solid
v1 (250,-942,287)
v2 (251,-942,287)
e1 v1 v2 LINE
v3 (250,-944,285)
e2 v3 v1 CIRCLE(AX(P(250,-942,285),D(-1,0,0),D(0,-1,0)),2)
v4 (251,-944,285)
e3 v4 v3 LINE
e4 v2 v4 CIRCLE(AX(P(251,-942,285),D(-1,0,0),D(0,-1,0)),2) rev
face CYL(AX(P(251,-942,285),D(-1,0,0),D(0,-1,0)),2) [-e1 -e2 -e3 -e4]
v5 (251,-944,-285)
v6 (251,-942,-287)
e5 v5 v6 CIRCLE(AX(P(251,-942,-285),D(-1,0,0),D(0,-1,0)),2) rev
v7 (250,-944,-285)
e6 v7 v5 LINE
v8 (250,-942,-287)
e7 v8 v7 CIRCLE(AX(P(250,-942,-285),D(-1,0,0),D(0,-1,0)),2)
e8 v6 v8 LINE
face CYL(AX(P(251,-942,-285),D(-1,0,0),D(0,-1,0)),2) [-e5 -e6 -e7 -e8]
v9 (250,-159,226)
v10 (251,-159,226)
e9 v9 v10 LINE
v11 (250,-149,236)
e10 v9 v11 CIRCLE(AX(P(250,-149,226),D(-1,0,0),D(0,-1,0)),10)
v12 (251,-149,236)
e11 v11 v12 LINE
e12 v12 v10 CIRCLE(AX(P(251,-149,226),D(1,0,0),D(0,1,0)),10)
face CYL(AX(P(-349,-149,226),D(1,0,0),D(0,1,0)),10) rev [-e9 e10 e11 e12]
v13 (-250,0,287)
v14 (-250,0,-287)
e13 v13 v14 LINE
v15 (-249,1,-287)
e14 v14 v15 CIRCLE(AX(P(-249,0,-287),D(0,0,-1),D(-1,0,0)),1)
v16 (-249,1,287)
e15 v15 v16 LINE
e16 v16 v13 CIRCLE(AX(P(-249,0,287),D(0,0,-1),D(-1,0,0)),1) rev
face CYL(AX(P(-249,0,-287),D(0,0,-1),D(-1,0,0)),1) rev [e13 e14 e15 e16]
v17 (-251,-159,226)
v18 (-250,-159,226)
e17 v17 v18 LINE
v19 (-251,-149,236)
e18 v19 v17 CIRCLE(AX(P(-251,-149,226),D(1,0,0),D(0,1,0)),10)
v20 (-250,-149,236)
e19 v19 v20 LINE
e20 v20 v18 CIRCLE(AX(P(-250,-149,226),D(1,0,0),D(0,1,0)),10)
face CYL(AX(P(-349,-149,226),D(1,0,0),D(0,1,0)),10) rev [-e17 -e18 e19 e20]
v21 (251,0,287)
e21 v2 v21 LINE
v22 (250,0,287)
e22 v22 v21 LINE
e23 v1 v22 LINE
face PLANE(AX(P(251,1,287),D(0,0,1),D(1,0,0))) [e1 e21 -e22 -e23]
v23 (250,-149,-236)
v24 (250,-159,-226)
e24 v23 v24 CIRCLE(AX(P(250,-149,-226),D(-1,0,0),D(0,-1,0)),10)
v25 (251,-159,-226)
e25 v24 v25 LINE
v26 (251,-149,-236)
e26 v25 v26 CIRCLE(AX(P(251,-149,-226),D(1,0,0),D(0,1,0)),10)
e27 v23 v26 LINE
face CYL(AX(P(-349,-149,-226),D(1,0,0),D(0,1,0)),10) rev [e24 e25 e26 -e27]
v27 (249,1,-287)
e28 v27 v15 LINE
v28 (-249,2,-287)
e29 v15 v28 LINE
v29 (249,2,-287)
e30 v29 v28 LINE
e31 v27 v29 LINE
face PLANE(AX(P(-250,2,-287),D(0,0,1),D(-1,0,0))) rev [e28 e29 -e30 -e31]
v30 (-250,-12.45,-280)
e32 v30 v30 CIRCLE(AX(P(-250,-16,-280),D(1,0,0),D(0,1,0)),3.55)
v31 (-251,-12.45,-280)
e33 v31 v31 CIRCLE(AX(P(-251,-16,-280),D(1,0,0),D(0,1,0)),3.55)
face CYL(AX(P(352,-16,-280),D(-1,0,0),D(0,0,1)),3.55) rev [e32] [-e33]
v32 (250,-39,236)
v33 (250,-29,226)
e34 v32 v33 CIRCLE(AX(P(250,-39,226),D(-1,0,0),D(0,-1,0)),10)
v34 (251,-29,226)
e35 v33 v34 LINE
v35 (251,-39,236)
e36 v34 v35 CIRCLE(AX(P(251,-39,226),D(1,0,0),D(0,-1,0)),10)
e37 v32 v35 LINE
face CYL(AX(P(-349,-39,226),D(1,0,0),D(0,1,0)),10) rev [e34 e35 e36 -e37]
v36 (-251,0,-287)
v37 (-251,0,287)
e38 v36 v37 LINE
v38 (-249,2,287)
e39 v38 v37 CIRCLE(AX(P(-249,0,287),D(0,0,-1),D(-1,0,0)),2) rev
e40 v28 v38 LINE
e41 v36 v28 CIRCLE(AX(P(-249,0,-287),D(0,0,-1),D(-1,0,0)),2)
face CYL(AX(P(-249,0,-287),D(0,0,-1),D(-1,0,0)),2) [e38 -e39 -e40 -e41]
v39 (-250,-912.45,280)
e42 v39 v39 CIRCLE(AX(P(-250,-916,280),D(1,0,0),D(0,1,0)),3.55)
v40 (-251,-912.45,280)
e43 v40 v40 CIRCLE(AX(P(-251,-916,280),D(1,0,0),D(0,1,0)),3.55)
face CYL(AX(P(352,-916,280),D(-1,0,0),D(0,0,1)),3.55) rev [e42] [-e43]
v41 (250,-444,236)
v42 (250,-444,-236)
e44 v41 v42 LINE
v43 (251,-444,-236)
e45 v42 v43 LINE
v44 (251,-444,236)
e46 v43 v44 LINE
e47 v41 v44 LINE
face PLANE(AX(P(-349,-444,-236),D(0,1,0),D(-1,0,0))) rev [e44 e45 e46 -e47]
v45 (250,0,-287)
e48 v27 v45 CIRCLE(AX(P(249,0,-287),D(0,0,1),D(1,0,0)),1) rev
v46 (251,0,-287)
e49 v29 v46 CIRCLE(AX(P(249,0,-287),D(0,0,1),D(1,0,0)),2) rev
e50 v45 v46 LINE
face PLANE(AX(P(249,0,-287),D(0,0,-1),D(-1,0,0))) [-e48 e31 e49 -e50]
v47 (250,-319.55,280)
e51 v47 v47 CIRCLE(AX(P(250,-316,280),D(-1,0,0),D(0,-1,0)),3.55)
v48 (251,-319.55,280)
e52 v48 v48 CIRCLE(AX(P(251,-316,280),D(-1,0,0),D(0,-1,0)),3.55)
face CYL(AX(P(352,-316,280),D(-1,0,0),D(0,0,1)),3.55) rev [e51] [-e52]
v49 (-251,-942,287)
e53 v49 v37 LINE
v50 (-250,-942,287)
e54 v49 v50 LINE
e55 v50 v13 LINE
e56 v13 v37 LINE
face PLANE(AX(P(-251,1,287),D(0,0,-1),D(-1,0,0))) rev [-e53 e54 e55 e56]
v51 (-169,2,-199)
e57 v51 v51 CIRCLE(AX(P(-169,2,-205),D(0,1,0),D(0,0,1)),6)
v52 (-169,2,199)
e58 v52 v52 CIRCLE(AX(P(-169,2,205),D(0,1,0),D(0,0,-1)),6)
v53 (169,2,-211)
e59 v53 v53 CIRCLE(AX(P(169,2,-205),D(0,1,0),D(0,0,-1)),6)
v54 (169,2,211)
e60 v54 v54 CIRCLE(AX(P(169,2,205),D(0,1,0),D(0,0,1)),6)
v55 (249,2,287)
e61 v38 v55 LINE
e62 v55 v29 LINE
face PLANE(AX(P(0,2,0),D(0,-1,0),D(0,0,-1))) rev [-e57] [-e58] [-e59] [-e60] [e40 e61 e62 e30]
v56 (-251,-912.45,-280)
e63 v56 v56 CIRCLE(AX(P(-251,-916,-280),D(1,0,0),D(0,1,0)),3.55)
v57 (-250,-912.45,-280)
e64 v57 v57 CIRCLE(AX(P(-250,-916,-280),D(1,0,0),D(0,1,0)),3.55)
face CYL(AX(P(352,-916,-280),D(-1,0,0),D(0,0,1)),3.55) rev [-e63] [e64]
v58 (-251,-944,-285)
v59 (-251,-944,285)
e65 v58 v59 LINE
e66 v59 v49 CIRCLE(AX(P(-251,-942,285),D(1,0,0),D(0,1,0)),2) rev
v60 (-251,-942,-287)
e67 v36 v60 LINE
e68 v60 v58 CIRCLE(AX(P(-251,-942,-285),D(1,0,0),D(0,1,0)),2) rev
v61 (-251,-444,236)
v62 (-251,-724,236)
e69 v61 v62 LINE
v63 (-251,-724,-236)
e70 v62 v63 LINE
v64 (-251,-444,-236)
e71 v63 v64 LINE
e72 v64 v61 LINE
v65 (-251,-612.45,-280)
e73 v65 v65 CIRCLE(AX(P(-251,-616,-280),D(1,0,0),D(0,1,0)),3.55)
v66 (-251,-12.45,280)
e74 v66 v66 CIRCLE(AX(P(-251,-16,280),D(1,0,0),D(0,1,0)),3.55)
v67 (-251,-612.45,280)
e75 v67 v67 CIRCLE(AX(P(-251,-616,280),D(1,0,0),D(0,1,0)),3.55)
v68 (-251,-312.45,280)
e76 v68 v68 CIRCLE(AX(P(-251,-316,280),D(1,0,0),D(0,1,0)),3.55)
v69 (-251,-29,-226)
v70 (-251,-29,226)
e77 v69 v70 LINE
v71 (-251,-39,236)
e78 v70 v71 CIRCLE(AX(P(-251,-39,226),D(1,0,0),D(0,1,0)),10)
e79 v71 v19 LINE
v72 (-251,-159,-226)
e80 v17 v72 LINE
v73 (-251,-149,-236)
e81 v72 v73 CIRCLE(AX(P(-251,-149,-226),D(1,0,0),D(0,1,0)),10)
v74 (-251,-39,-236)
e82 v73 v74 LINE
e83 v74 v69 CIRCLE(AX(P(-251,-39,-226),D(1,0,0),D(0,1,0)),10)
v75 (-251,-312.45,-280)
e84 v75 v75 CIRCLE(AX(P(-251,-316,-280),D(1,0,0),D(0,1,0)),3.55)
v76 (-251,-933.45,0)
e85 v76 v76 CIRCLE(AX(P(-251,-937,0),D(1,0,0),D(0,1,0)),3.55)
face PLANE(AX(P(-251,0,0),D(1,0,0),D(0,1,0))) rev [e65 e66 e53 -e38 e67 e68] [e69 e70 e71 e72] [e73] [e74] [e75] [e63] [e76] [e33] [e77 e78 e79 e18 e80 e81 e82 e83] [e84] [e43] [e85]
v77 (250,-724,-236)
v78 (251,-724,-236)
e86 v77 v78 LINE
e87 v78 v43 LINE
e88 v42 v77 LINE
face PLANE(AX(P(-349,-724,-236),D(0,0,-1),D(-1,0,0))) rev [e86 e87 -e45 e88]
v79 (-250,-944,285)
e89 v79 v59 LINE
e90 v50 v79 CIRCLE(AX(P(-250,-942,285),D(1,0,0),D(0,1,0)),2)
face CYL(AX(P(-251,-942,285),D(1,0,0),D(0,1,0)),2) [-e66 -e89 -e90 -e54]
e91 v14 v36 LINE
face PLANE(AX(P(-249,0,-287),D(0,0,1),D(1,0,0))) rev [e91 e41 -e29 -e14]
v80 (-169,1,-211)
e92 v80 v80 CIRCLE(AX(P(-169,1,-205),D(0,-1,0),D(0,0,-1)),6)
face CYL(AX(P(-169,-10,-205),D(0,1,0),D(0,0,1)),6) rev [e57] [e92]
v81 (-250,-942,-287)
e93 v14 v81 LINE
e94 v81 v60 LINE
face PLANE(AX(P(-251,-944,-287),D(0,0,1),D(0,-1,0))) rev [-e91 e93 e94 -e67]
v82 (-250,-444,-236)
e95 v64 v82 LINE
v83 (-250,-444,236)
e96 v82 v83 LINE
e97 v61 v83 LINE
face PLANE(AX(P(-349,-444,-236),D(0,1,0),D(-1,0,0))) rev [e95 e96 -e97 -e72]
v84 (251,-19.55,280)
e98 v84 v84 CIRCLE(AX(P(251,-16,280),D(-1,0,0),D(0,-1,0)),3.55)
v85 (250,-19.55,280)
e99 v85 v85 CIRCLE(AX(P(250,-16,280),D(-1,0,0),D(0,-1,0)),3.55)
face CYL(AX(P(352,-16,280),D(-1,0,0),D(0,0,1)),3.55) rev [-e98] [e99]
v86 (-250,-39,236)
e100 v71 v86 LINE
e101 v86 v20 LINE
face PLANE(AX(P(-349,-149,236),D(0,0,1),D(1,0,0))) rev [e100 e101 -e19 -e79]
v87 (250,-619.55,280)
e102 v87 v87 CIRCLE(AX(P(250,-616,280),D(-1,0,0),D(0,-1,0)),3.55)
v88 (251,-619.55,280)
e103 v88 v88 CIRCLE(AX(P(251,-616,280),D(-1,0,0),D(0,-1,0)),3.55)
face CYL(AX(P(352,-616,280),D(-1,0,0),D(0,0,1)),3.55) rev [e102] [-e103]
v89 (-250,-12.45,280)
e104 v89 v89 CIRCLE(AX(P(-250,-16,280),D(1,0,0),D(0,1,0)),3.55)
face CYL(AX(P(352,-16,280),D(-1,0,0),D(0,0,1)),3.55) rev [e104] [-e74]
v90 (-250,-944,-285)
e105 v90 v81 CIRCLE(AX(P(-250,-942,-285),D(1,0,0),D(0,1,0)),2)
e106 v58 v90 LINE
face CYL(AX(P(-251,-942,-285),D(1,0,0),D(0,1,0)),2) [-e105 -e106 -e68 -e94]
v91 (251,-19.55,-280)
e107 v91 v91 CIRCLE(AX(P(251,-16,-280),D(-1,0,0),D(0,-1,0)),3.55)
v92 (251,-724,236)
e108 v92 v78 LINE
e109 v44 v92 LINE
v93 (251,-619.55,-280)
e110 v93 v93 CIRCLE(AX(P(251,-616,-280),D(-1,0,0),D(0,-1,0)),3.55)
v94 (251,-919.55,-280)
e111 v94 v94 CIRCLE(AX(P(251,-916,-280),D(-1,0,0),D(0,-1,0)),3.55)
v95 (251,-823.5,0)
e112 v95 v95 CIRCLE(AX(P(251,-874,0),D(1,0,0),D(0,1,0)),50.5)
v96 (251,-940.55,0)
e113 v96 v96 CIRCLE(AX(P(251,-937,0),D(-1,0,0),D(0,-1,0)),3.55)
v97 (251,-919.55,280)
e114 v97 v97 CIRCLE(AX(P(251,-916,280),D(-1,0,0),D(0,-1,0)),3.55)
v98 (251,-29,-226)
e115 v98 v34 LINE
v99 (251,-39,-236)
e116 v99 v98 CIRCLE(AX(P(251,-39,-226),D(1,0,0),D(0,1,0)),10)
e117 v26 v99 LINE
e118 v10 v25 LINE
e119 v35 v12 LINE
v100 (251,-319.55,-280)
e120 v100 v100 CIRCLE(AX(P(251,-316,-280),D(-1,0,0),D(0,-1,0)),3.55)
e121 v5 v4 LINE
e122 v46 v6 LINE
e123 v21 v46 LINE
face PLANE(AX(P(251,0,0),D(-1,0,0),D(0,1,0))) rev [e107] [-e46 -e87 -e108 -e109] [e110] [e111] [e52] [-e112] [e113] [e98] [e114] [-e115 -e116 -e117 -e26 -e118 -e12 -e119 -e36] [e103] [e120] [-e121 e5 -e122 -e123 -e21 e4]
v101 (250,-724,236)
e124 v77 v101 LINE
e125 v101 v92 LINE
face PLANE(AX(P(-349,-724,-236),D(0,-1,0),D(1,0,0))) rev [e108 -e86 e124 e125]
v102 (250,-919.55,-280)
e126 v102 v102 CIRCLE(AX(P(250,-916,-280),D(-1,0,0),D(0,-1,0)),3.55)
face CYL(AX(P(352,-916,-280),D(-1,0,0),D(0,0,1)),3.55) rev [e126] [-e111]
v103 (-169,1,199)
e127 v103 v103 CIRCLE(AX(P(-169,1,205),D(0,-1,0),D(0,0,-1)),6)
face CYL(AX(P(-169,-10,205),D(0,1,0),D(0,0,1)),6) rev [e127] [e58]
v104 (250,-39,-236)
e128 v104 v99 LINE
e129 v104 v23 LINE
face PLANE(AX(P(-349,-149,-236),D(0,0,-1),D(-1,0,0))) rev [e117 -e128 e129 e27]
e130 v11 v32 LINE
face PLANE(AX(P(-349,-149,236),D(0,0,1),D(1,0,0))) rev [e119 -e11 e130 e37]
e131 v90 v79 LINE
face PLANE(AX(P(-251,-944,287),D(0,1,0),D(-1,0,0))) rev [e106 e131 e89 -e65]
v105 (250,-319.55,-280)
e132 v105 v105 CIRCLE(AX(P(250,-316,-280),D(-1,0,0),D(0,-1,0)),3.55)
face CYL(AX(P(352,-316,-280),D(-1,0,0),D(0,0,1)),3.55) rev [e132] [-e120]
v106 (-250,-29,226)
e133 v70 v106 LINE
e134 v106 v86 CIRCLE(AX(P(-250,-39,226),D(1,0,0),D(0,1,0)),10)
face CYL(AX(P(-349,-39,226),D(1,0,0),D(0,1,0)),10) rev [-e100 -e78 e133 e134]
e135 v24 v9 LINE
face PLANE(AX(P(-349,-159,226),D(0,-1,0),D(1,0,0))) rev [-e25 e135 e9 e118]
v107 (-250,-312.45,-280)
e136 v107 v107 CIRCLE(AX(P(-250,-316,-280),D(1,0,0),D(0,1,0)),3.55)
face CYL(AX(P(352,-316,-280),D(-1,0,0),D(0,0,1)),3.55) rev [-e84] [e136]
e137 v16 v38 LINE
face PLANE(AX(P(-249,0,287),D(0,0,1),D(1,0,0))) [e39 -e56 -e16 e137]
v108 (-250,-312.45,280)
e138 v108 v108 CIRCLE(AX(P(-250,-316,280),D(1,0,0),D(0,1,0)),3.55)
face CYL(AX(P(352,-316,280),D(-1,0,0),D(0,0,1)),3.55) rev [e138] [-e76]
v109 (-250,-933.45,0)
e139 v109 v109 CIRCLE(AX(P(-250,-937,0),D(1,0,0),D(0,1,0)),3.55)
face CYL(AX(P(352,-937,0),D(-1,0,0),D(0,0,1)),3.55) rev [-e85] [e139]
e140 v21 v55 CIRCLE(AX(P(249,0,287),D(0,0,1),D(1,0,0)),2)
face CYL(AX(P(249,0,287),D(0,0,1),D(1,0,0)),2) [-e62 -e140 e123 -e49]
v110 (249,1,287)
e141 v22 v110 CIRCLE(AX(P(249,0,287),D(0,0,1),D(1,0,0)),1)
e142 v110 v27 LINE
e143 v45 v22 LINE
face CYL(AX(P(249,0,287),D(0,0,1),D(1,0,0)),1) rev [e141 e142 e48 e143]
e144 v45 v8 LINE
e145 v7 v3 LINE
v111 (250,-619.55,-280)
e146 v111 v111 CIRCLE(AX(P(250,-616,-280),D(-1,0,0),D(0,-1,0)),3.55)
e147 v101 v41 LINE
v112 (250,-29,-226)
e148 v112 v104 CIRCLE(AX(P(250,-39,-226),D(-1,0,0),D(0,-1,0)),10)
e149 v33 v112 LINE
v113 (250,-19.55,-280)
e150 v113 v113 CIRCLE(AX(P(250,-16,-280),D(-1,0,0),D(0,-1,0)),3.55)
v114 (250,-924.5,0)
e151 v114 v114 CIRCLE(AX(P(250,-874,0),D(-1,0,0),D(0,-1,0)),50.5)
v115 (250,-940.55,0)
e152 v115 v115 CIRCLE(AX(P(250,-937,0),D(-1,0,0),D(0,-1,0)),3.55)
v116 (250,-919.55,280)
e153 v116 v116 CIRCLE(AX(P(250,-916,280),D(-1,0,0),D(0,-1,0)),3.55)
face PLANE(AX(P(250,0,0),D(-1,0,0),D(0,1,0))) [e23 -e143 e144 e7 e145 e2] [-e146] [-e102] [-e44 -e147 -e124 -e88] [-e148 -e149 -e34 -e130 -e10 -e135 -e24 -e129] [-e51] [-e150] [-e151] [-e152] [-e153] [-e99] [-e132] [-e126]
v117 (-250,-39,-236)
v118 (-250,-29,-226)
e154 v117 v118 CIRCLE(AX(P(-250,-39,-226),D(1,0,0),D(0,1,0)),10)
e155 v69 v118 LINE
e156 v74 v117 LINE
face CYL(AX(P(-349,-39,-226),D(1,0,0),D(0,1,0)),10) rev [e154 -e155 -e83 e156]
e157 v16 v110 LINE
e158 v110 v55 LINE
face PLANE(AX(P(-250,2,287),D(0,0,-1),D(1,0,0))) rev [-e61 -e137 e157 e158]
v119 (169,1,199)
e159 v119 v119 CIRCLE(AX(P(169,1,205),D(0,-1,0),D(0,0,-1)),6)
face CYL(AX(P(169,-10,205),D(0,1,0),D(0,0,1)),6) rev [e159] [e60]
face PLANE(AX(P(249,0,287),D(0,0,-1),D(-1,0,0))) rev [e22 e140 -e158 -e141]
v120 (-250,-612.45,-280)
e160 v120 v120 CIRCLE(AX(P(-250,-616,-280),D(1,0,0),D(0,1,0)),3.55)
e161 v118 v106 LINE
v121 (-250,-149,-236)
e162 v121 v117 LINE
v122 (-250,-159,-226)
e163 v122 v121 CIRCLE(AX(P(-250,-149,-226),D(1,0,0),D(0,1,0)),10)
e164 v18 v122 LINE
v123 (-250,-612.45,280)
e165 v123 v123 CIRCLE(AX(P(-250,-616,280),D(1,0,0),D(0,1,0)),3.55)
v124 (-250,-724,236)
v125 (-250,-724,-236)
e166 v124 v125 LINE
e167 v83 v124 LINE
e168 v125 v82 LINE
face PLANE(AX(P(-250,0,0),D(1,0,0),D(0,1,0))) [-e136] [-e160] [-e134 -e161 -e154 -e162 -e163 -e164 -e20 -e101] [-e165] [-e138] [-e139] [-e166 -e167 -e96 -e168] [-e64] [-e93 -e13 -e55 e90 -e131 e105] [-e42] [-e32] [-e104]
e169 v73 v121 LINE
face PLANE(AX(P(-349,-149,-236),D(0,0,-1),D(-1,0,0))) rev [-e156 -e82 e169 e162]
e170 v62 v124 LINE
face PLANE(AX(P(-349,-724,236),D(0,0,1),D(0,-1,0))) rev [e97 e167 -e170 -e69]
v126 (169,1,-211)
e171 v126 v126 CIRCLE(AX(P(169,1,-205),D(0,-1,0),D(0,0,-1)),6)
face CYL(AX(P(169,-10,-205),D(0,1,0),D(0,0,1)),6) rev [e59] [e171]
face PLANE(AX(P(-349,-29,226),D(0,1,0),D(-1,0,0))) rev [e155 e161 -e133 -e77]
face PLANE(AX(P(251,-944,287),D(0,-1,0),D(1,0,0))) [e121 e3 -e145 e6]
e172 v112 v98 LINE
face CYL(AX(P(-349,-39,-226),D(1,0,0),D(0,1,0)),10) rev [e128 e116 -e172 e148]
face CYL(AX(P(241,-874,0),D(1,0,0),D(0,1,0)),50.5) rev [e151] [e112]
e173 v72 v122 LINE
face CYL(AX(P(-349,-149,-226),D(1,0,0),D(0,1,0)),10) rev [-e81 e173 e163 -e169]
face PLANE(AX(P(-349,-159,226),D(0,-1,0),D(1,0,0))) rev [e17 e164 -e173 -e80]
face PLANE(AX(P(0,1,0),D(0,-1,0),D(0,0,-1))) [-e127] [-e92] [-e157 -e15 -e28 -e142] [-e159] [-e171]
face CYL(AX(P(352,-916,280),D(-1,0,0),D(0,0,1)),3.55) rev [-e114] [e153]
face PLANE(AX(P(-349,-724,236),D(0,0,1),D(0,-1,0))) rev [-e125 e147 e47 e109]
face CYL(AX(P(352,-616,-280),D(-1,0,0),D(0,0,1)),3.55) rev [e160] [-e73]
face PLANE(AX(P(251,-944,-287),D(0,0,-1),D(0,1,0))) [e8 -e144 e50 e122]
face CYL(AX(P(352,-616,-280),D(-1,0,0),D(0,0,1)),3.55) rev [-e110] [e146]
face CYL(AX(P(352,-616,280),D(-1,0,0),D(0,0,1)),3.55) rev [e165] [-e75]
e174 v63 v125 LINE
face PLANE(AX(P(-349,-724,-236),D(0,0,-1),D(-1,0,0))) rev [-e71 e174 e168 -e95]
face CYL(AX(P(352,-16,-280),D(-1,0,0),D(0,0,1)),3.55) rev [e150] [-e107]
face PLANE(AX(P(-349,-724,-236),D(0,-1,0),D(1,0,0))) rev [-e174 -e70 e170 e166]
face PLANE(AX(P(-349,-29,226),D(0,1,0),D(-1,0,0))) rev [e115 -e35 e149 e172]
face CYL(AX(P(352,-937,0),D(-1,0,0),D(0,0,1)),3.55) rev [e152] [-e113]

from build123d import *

# Parameters (mm, degrees)
SKETCH1_W                    = 500
SKETCH1_H                    = 574
BOSS_EXTRUDE1_DEPTH          = 2
CONVERT_SOLID1_OUTLINE_W     = 500
CONVERT_SOLID1_OUTLINE_H     = 574
CONVERT_SOLID1_DEPTH         = 1
EDGE_FLANGE1_STRIP_W         = 6
EDGE_FLANGE1_STRIP_H         = 1
EDGE_FLANGE1_STRIP_CUT_DEPTH = 574
EDGE_FLANGE1_DEPTH           = 574
SKETCH11_W                   = 280
SKETCH11_H                   = 472
CUT_EXTRUDE1_DEPTH           = 600
SKETCH12_R                   = 50.5
CUT_EXTRUDE2_DEPTH           = 10
SKETCH13_R                   = 6
CUT_EXTRUDE3_DEPTH           = 12
FILLET2_R                    = 2
CUT_EXTRUDE7_START           = -499
CUT_EXTRUDE7_OUTLINE_R       = 3.55
CUT_EXTRUDE7_DEPTH           = 502


# Read off the part's stored shape, not the designer's step: Convert-Solid1, Cut-Extrude7
# Sheet-metal steps are written as plain solids
with BuildPart() as part:
    # Sketch1 → Boss-Extrude1 (new body)
    with BuildSketch(Plane(origin=(0, 0, 0), x_dir=(1, 0, 0), z_dir=(0, 1, 0))):
        Rectangle(SKETCH1_W, SKETCH1_H)
    extrude(amount=BOSS_EXTRUDE1_DEPTH)

    # Convert-Solid1 outline → Convert-Solid1 (cut)
    with BuildSketch(Plane(origin=(0, 0, 0), x_dir=(1, 0, 0), z_dir=(0, 1, 0))):
        Rectangle(CONVERT_SOLID1_OUTLINE_W, CONVERT_SOLID1_OUTLINE_H)
    extrude(amount=CONVERT_SOLID1_DEPTH, mode=Mode.SUBTRACT)

    # Edge-Flange1 strip (across the edge) → Edge-Flange1 strip cut (cut)
    with BuildSketch(Plane(origin=(-250, 1, 287), x_dir=(1, 0, 0), z_dir=(0, 0, -1))):
        with Locations((-2, -0.5)):
            Rectangle(EDGE_FLANGE1_STRIP_W, EDGE_FLANGE1_STRIP_H)
    edge_flange1_strip_cut = extrude(amount=EDGE_FLANGE1_STRIP_CUT_DEPTH, mode=Mode.SUBTRACT)

    # Edge-Flange1 section (across the edge) → Edge-Flange1 (add)
    with BuildSketch(Plane(origin=(-250, 1, 287), x_dir=(1, 0, 0), z_dir=(0, 0, -1))):
        with BuildLine():
            Line((-1, 1), (-1, 945))
            Line((-1, 945), (0, 945))
            Line((0, 945), (0, 1))
            ThreePointArc((0, 1), (0.292893219, 0.292893219), (1, 0))
            Line((1, 0), (1, -1))
            ThreePointArc((1, -1), (-0.414213562, -0.414213562), (-1, 1))
        make_face()
    edge_flange1 = extrude(amount=EDGE_FLANGE1_DEPTH)

    # Mirror1: Edge-Flange1 strip cut, Edge-Flange1 across plane
    add(edge_flange1_strip_cut.mirror(Plane(origin=(0, 0, 0), x_dir=(0, 0, 1), z_dir=(1, 0, 0))), mode=Mode.SUBTRACT)
    add(edge_flange1.mirror(Plane(origin=(0, 0, 0), x_dir=(0, 0, 1), z_dir=(1, 0, 0))))

    # Sketch11 → Cut-Extrude1 (cut)
    with BuildSketch(Plane(origin=(251, 40.165636604, 898.471308301), x_dir=(0, 1, 0), z_dir=(1, 0, 0))):
        with Locations((-624.165636604, -898.471308301)):
            Rectangle(SKETCH11_W, SKETCH11_H)
        with BuildLine():
            Line((-189.165636604, -662.471308301), (-79.165636604, -662.471308301))
            ThreePointArc((-79.165636604, -662.471308301), (-72.094568792, -665.400240489), (-69.165636604, -672.471308301))
            Line((-69.165636604, -672.471308301), (-69.165636604, -1124.471308301))
            ThreePointArc((-69.165636604, -1124.471308301), (-72.094568792, -1131.542376113), (-79.165636604, -1134.471308301))
            Line((-79.165636604, -1134.471308301), (-189.165636604, -1134.471308301))
            ThreePointArc((-189.165636604, -1134.471308301), (-196.236704416, -1131.542376113), (-199.165636604, -1124.471308301))
            Line((-199.165636604, -1124.471308301), (-199.165636604, -672.471308301))
            ThreePointArc((-199.165636604, -672.471308301), (-196.236704416, -665.400240489), (-189.165636604, -662.471308301))
        make_face()
    extrude(amount=-CUT_EXTRUDE1_DEPTH, mode=Mode.SUBTRACT)

    # Sketch12 → Cut-Extrude2 (cut)
    with BuildSketch(Plane(origin=(251, 40.165636604, 898.471308301), x_dir=(0, 1, 0), z_dir=(1, 0, 0))):
        with Locations((-914.165636604, -898.471308301)):
            Circle(SKETCH12_R)
    extrude(amount=-CUT_EXTRUDE2_DEPTH, mode=Mode.SUBTRACT)

    # Sketch13 → Cut-Extrude3 (cut)
    with BuildSketch(Plane(origin=(-635.072358446, 2, 898.471308301), x_dir=(-1, 0, 0), z_dir=(0, 1, 0))):
        with Locations(Location((-804.072358446, -693.471308301, 0), (0, 0, 90))):
            Circle(SKETCH13_R)
        with Locations(Location((-466.072358446, -693.471308301, 0), (0, 0, 270))):
            Circle(SKETCH13_R)
        with Locations(Location((-466.072358446, -1103.471308301, 0), (0, 0, 90))):
            Circle(SKETCH13_R)
        with Locations(Location((-804.072358446, -1103.471308301, 0), (0, 0, 270))):
            Circle(SKETCH13_R)
    extrude(amount=-CUT_EXTRUDE3_DEPTH, mode=Mode.SUBTRACT)

    # Fillet2
    fillet2_edges = [part.edges().sort_by_distance(p)[0] for p in [
        (-250.5, -944, 287),
        (-250.5, -944, -287),
        (250.5, -944, -287),
        (250.5, -944, 287),
    ]]
    fillet(fillet2_edges, radius=FILLET2_R)

    # Cut-Extrude7 outline → Cut-Extrude7 (cut)
    with BuildSketch(Plane(origin=(-248, 561.16698045, 1244.210853702), x_dir=(0, -1, 0), z_dir=(-1, 0, 0)).offset(CUT_EXTRUDE7_START)):
        with Locations((577.16698045, -1524.210853702)):
            Circle(CUT_EXTRUDE7_OUTLINE_R)
        with Locations((877.16698045, -1524.210853702)):
            Circle(CUT_EXTRUDE7_OUTLINE_R)
        with Locations((1177.16698045, -1524.210853702)):
            Circle(CUT_EXTRUDE7_OUTLINE_R)
        with Locations((1477.16698045, -1524.210853702)):
            Circle(CUT_EXTRUDE7_OUTLINE_R)
        with Locations((1498.16698045, -1244.210853702)):
            Circle(CUT_EXTRUDE7_OUTLINE_R)
        with Locations((1477.16698045, -964.210853702)):
            Circle(CUT_EXTRUDE7_OUTLINE_R)
        with Locations((1177.16698045, -964.210853702)):
            Circle(CUT_EXTRUDE7_OUTLINE_R)
        with Locations((877.16698045, -964.210853702)):
            Circle(CUT_EXTRUDE7_OUTLINE_R)
        with Locations((577.16698045, -964.210853702)):
            Circle(CUT_EXTRUDE7_OUTLINE_R)
    extrude(amount=CUT_EXTRUDE7_DEPTH, mode=Mode.SUBTRACT)


solid = part.part
